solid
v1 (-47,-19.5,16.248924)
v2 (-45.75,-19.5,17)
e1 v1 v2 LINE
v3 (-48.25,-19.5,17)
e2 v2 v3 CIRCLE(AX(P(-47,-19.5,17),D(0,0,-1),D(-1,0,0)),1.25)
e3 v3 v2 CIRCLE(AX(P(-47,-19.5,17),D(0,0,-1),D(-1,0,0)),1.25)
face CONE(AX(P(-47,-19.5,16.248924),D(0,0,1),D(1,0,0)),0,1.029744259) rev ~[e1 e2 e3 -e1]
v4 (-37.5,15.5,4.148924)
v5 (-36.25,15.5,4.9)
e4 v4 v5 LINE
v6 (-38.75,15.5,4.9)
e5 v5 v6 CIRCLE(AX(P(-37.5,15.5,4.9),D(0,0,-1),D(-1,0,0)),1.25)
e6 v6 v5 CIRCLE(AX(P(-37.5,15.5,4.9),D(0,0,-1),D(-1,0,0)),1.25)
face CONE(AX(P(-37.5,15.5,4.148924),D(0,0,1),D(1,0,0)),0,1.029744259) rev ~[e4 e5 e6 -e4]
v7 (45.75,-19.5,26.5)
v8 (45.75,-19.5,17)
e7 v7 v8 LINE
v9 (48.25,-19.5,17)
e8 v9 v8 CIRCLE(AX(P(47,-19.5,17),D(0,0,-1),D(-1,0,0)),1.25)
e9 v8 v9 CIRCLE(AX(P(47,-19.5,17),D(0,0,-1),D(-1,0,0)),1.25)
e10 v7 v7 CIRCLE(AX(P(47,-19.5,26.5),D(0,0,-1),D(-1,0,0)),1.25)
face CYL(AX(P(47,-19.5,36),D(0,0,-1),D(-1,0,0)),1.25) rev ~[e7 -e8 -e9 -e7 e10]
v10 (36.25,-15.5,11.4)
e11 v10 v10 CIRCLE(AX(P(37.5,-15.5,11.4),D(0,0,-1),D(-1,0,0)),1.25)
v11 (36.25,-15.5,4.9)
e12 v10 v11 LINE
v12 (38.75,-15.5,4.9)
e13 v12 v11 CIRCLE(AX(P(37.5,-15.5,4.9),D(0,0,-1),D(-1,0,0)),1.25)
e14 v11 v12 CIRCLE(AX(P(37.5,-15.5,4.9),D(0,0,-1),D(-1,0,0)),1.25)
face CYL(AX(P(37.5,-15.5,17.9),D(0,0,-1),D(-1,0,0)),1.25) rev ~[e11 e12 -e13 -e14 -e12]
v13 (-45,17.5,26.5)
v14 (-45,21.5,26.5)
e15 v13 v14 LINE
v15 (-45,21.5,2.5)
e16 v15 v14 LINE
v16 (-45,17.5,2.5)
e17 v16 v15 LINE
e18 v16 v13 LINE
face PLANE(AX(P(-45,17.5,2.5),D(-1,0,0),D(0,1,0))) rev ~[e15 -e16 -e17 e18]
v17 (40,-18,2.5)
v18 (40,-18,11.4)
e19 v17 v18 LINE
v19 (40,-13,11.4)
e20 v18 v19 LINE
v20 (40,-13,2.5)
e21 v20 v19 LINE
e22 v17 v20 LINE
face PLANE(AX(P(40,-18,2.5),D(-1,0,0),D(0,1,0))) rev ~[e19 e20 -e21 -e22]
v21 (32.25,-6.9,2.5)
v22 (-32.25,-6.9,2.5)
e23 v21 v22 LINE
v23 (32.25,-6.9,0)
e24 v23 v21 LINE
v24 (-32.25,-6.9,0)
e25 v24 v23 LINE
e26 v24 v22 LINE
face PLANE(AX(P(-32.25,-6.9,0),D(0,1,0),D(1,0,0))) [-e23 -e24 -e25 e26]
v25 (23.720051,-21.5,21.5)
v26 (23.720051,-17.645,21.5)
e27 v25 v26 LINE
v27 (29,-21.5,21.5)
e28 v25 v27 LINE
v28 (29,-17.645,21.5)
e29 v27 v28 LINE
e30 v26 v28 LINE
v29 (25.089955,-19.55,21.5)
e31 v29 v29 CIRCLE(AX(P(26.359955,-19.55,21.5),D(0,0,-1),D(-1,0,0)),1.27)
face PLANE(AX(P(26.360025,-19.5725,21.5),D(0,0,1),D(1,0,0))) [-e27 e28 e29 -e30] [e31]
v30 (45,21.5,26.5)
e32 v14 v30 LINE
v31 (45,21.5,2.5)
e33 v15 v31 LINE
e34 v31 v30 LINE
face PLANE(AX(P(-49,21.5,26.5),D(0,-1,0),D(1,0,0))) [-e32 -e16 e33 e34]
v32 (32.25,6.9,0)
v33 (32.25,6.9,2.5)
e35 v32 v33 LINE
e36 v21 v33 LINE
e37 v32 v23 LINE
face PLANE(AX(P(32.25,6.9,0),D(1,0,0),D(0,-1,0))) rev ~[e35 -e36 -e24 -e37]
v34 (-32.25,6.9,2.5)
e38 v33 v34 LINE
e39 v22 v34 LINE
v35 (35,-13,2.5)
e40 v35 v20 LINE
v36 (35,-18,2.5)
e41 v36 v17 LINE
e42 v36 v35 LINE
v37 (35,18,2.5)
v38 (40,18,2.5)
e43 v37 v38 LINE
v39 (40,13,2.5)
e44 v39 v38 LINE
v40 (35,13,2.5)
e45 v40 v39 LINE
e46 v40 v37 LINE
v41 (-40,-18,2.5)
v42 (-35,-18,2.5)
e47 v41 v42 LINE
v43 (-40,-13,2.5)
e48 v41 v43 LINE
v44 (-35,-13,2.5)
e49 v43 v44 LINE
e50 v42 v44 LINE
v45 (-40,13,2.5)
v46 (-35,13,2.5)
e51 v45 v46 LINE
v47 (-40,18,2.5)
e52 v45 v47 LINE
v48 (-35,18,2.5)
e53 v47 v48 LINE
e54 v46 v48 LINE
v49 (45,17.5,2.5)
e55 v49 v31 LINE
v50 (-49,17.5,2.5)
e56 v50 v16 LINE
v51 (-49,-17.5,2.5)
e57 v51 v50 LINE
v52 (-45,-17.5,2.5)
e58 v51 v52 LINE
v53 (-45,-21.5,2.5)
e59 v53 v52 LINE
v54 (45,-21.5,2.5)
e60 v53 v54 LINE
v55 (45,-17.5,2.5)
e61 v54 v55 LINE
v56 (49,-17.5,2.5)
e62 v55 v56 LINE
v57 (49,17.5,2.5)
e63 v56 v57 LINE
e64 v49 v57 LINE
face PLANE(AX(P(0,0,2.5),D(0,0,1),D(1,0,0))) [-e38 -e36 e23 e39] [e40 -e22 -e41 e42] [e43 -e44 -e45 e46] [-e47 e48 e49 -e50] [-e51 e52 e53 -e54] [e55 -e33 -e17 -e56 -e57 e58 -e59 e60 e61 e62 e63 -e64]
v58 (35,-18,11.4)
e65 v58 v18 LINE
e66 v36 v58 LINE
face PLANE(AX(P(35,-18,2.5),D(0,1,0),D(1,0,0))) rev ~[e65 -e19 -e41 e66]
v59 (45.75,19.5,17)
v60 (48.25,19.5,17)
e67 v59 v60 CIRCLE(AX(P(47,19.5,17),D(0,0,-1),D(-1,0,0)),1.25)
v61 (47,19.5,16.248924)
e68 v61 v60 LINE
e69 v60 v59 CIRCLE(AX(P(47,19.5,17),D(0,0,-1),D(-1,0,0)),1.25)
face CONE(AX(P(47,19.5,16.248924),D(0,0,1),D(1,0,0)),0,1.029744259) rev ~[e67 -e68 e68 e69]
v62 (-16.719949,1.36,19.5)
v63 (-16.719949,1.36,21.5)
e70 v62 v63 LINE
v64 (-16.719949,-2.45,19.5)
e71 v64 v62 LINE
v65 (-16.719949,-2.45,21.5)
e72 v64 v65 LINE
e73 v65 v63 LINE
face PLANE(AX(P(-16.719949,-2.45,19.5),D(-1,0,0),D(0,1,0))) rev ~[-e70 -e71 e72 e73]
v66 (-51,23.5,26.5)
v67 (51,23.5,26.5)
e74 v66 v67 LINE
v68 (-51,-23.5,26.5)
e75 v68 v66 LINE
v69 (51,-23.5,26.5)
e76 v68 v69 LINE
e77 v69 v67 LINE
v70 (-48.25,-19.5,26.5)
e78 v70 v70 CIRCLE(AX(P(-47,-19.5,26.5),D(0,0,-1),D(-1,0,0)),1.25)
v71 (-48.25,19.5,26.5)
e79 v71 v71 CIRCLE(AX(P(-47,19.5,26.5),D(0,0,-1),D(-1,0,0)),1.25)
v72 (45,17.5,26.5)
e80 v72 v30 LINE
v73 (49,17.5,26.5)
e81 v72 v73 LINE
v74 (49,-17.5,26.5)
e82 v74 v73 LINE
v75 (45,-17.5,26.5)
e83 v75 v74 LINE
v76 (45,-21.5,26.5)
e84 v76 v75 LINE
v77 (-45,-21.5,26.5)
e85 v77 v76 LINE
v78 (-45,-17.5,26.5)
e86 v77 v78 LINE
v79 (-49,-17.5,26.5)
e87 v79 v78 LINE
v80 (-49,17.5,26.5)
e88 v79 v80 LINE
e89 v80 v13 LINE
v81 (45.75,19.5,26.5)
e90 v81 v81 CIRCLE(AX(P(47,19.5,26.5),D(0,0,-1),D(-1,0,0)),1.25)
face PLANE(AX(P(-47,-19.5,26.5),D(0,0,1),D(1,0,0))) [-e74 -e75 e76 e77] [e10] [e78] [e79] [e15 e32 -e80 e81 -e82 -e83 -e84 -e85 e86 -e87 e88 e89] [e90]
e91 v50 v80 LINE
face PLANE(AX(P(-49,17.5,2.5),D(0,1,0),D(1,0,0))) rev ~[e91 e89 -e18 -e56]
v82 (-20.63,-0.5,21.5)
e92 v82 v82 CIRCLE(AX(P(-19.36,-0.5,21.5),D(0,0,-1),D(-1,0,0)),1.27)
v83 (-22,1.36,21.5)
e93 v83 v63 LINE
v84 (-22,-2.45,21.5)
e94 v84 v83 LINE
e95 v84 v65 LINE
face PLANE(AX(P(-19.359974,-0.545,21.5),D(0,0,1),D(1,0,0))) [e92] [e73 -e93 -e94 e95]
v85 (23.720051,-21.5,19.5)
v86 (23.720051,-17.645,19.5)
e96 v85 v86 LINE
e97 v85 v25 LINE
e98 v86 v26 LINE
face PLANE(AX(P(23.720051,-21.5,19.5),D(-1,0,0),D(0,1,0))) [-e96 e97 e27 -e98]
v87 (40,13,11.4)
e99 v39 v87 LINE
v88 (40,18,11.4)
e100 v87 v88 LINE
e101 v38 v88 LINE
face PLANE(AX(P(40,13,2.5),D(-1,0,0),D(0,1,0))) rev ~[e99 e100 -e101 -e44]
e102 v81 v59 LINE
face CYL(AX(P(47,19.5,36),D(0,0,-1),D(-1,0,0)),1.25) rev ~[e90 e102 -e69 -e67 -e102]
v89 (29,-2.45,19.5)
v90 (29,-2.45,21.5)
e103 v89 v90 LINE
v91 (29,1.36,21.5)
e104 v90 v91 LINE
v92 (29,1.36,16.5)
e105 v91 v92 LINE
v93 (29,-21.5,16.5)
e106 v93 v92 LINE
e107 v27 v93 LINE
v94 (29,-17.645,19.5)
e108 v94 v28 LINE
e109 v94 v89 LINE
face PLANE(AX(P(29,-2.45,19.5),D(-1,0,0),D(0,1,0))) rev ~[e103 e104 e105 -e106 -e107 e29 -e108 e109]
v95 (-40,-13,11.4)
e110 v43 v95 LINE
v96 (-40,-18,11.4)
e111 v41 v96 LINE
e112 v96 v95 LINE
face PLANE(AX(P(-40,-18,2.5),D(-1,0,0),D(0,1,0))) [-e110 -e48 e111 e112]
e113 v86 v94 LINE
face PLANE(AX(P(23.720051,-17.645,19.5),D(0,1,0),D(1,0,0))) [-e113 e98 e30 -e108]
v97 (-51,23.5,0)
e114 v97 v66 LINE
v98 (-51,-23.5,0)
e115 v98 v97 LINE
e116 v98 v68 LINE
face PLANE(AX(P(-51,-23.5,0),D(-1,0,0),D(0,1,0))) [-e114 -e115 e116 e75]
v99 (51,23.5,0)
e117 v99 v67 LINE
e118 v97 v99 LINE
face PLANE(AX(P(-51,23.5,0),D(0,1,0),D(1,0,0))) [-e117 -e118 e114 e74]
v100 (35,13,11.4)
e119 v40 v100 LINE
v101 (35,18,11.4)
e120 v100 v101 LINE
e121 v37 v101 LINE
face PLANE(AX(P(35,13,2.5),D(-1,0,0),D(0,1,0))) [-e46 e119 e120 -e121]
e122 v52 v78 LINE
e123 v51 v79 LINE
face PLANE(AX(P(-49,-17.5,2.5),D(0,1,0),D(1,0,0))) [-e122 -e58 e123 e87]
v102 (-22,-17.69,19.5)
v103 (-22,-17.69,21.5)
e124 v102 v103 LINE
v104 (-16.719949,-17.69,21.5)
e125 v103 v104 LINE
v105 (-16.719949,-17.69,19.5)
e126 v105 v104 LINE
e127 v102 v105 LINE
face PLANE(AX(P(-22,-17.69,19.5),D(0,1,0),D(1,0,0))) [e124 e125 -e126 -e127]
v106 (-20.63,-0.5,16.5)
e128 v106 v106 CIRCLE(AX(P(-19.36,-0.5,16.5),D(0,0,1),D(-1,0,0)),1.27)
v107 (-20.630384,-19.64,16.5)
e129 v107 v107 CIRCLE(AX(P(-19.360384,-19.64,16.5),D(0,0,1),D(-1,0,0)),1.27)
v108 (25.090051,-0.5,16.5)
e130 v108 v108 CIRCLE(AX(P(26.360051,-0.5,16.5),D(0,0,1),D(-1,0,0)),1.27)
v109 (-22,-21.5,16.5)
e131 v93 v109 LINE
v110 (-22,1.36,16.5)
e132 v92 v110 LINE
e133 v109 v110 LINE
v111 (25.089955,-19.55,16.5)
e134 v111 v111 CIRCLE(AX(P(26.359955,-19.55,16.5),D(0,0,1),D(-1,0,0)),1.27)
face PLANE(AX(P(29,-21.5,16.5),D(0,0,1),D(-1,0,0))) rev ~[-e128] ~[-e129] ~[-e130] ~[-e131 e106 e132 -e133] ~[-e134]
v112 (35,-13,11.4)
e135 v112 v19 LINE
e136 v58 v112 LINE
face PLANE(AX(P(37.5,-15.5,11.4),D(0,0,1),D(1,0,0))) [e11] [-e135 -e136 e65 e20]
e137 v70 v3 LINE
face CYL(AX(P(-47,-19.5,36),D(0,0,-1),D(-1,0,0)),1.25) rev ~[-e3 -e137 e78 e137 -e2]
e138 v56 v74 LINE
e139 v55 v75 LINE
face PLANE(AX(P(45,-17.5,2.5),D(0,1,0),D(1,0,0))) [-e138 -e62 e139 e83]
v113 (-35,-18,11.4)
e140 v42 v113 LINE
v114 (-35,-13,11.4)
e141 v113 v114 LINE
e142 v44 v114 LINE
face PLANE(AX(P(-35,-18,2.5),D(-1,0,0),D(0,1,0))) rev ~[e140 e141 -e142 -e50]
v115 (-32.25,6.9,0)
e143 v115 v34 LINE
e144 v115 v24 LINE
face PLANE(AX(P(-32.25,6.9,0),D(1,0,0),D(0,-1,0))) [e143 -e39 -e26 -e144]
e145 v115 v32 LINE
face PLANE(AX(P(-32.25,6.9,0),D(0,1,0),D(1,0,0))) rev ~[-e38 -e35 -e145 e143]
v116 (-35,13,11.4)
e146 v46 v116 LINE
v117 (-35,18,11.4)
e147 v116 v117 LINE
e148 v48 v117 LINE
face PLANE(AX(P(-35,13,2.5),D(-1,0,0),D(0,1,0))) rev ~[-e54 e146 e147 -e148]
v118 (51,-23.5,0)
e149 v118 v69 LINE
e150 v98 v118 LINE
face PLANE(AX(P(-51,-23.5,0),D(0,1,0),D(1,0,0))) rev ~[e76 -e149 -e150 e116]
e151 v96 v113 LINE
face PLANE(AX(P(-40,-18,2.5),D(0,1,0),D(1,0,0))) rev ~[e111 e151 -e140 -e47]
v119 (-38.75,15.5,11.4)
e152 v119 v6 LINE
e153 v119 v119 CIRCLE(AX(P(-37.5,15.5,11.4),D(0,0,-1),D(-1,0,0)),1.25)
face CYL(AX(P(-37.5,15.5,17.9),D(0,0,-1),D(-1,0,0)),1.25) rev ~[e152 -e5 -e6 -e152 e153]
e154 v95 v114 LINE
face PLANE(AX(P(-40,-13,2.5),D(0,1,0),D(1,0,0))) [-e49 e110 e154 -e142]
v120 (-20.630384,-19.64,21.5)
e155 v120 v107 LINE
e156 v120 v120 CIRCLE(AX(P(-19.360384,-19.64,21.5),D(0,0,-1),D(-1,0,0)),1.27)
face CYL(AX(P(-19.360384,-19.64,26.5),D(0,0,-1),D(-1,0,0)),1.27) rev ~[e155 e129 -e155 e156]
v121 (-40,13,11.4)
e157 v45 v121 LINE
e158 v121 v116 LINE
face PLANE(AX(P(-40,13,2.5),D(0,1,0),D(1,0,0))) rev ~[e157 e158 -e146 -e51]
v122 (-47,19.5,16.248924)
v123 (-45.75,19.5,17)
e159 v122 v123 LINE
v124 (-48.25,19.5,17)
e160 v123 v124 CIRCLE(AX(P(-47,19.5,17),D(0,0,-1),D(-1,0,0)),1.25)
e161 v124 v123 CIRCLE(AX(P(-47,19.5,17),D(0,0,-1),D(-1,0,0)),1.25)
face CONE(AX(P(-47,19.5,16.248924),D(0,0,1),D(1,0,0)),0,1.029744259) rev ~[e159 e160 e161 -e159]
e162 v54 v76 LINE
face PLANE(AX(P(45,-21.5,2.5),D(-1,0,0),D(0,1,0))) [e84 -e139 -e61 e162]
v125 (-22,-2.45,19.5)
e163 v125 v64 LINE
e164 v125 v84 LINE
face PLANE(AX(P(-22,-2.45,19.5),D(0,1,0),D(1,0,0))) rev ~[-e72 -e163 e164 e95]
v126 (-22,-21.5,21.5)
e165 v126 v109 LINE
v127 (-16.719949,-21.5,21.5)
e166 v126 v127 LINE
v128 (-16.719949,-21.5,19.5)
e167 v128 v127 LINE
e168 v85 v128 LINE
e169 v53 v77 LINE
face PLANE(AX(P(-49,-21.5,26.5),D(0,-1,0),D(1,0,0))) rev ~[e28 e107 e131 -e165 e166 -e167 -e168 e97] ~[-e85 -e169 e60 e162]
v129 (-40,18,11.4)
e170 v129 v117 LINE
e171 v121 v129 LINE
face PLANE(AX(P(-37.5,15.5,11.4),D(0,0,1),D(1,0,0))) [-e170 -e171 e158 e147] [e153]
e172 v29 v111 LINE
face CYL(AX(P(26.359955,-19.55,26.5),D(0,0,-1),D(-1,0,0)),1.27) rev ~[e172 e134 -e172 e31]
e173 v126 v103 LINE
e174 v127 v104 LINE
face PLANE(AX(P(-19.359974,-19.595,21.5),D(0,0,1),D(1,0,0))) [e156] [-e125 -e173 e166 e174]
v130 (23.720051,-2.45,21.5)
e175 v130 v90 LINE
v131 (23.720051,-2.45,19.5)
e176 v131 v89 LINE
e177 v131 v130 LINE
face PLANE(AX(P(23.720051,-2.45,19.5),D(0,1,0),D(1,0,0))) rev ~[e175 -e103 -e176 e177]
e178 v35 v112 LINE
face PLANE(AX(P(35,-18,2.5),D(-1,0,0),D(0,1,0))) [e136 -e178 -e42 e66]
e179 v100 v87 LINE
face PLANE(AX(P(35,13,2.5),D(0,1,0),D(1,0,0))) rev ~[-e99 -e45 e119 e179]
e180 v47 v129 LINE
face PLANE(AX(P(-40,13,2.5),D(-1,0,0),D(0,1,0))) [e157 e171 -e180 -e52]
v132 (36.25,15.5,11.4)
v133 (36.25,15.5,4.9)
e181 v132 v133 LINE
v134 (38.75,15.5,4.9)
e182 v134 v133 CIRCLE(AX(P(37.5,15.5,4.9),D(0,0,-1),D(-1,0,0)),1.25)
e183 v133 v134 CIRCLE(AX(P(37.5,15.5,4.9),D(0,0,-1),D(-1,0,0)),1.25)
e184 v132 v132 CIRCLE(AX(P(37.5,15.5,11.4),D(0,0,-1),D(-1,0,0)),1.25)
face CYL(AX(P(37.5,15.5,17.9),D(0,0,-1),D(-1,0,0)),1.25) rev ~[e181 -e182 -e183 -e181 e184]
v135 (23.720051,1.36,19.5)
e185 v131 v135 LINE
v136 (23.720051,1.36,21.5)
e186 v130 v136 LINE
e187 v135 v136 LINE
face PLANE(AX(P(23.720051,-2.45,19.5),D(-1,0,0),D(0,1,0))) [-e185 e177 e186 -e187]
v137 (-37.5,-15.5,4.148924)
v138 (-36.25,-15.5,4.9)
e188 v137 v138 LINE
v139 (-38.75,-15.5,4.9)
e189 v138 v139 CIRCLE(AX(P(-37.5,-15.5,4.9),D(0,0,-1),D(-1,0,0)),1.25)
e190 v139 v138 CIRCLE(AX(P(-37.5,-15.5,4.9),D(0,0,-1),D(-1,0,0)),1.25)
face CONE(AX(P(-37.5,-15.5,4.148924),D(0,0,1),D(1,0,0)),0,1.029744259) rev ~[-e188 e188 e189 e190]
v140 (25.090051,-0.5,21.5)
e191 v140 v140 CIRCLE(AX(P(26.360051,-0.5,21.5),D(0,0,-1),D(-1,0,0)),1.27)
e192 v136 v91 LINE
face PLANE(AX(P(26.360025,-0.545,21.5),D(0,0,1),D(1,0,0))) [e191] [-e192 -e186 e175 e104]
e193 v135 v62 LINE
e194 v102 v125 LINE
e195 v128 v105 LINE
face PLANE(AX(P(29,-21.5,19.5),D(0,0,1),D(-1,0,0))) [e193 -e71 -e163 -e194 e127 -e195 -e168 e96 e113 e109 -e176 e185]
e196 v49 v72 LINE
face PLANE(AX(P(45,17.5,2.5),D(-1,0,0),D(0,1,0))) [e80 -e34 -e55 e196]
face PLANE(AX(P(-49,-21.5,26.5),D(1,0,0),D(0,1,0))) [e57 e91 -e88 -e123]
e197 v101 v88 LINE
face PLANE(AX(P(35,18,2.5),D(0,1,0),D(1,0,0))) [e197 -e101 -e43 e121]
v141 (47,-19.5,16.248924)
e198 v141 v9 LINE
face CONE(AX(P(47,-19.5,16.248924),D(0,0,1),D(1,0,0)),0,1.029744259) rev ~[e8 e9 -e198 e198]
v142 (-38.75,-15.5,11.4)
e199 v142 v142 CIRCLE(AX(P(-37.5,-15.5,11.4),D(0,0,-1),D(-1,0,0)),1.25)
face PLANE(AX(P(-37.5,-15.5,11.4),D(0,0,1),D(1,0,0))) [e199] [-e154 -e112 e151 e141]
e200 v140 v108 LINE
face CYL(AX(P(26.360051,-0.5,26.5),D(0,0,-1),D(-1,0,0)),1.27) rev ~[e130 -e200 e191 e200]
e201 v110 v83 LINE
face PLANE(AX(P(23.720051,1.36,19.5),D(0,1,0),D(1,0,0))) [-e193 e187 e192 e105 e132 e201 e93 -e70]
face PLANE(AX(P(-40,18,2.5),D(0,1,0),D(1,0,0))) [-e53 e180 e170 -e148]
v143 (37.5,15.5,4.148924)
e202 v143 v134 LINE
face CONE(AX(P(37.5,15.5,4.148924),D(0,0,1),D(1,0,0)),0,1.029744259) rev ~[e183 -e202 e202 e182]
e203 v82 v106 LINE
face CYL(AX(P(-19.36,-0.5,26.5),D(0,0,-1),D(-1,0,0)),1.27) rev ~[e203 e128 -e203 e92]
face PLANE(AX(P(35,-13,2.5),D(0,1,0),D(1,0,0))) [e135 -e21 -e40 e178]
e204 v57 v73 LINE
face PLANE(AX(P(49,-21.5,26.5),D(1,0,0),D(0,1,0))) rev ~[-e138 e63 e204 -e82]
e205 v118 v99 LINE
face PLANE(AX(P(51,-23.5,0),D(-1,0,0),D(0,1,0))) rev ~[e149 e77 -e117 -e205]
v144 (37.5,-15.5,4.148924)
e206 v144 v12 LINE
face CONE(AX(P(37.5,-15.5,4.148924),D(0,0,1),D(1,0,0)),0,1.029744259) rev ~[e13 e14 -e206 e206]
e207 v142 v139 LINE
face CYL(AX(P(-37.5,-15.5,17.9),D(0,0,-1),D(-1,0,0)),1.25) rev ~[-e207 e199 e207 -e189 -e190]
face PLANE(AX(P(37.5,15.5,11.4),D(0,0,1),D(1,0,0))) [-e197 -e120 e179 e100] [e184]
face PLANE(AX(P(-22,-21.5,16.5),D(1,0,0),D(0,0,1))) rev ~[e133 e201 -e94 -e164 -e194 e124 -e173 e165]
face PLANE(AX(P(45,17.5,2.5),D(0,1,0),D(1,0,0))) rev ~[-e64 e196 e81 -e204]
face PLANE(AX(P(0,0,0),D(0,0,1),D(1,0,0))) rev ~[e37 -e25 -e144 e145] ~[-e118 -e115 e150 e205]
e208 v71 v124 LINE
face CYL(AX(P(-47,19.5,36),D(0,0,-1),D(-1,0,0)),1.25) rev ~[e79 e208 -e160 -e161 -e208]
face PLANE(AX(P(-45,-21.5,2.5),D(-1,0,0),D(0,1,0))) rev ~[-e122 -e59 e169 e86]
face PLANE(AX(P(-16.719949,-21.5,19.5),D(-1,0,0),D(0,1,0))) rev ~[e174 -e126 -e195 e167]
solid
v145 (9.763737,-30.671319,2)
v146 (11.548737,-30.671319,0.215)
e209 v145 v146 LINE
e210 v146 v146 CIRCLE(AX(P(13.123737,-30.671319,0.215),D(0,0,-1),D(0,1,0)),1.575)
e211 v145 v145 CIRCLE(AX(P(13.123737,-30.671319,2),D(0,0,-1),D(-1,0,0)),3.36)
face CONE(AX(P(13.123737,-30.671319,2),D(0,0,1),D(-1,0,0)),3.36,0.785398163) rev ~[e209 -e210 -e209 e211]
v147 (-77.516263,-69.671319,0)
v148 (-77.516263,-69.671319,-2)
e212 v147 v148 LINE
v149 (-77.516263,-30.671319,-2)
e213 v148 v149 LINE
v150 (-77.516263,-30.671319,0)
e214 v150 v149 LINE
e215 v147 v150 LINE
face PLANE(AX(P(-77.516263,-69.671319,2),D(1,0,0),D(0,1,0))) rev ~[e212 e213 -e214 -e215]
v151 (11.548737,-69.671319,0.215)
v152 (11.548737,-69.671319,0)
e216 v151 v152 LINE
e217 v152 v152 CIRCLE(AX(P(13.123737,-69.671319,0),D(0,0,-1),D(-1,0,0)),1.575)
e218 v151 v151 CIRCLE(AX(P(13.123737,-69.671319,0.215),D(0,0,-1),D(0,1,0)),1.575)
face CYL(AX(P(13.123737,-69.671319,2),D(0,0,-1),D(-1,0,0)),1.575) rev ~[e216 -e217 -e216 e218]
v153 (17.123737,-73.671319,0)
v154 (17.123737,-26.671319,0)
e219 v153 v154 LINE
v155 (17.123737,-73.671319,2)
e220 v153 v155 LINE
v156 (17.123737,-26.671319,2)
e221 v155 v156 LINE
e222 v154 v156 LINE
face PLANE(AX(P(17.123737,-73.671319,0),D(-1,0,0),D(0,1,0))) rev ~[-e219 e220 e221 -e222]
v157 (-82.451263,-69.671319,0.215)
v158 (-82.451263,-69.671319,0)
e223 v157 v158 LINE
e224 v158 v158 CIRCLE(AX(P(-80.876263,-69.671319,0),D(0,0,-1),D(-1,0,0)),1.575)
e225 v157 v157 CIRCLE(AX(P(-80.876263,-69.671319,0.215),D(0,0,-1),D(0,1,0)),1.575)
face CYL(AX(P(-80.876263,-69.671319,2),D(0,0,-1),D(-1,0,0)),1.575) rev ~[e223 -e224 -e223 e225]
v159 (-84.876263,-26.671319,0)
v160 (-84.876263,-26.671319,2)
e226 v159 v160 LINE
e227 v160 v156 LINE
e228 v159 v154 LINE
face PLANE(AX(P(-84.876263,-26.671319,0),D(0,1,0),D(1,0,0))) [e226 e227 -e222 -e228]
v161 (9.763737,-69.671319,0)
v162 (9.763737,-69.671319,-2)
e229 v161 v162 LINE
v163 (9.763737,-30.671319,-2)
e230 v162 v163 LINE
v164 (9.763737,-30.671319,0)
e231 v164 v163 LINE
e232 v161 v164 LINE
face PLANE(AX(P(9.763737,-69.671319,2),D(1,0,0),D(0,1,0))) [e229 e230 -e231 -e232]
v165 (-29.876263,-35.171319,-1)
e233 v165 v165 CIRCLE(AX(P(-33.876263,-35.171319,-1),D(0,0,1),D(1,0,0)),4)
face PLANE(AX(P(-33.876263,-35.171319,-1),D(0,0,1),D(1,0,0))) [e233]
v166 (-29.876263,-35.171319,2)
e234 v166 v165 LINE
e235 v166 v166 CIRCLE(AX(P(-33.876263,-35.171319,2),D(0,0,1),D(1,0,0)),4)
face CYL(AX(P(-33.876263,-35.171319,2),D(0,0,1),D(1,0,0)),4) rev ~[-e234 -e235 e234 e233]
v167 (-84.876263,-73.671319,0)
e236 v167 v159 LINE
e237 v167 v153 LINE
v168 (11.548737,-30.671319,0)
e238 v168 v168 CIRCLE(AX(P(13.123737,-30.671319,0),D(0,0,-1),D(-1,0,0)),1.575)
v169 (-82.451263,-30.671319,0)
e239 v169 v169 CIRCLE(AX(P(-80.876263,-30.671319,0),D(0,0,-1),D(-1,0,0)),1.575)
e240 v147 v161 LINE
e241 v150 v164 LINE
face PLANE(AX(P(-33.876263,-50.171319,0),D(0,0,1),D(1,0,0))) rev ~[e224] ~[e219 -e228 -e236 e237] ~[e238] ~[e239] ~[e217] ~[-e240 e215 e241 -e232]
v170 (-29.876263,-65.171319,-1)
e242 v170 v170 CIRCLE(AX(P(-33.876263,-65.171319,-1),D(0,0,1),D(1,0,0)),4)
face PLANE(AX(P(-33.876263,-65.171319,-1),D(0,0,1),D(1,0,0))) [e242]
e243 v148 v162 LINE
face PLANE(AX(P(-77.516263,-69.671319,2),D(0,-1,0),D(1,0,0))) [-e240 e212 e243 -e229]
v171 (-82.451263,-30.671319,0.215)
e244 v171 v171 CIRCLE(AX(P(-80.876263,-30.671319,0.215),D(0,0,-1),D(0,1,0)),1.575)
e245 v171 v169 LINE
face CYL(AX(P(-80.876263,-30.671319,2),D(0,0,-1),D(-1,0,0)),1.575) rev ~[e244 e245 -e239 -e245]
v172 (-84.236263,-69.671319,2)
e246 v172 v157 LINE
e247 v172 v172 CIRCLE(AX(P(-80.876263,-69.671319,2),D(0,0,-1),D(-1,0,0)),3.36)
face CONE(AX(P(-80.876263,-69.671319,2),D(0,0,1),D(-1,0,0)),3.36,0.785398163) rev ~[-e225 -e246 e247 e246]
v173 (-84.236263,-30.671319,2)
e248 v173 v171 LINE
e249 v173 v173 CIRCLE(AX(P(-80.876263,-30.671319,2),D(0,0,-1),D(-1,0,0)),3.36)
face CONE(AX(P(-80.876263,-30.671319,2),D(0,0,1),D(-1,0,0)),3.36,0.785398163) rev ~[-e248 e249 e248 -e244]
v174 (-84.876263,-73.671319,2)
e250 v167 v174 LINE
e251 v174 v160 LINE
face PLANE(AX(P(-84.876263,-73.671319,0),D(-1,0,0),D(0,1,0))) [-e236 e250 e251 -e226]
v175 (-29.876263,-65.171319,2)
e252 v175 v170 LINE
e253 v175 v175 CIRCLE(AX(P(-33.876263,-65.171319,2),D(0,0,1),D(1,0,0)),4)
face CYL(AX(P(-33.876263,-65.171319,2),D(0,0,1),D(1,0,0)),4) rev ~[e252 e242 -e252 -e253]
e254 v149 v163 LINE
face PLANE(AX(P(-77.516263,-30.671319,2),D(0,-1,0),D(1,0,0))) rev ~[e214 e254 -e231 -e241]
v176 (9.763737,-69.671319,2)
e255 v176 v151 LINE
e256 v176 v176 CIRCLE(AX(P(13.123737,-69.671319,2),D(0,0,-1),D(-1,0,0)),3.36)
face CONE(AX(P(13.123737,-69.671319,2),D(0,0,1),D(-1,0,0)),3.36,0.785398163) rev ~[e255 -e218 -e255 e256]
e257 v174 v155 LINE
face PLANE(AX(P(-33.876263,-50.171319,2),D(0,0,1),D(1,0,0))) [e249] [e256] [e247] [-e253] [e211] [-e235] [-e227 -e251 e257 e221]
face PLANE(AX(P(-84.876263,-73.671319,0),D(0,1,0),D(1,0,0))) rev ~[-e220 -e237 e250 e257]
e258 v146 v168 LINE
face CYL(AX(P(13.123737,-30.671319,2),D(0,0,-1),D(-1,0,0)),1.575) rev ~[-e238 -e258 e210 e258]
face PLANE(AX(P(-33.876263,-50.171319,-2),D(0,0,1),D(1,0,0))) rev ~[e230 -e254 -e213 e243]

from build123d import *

# Parameters (mm, degrees)
F0_W             = 102
F0_H             = 47
F1_DEPTH         = 26.5
F2_W             = 98
F2_H             = 43
F3_DEPTH         = 24
F4_W             = 64.5
F4_H             = 13.8
F5_DEPTH         = 26.501
F6_W             = 5
F6_H             = 5
F7_DEPTH         = 8.9
F12_D            = 2.5
F12_DEPTH        = 6.5
F12_TIP          = 0.7510757738
F12_ON_F9_D      = 2.5
F12_ON_F9_DEPTH  = 6.5
F12_ON_F9_TIP    = 0.7510757738
F12_ON_F11_D     = 2.5
F12_ON_F11_DEPTH = 6.5
F12_ON_F11_TIP   = 0.7510757738
F12_ON_F10_D     = 2.5
F12_ON_F10_DEPTH = 6.5
F12_ON_F10_TIP   = 0.7510757738
F13_W            = 4
F13_H            = 4
F14_DEPTH        = 24
F16_D            = 2.5
F16_DEPTH        = 9.5
F16_TIP          = 0.7510757738
F17_W            = 102
F17_H            = 47
F18_DEPTH        = 2
F20_D            = 3.15
F20_CSINK_D      = 6.72
F20_CSINK_ANGLE  = 90
F21_W            = 87.28
F21_H            = 39
F22_DEPTH        = 4
F23_R            = 4
F24_DEPTH        = 3
F25_W            = 51
F25_H            = 3
F26_DEPTH        = 22.86
F27_W            = 5.279949
F27_H            = 3.81
F27_H_2          = 3.855
F27_W_2          = 5.280051
F28_DEPTH        = 2
F33_D            = 2.54
F33_DEPTH        = 5
F33_TIP          = 0.7630929862
F33_ON_F30_D     = 2.54
F33_ON_F30_DEPTH = 5
F33_ON_F30_TIP   = 0.7630929862
F33_ON_F32_D     = 2.54
F33_ON_F32_DEPTH = 5
F33_ON_F32_TIP   = 0.7630929862
F33_ON_F31_D     = 2.54
F33_ON_F31_DEPTH = 5
F33_ON_F31_TIP   = 0.7630929862


# Not quite as in the source:
# - a feature names something its author has since deleted; it is built from what else it names


with BuildPart() as f1:
    # F0 (on Top) → F1 (new body)
    with BuildSketch(Plane.XY):
        Rectangle(F0_W, F0_H)
    extrude(amount=F1_DEPTH)

    # F2 (on face) → F3 (cut)
    with BuildSketch(Plane.XY.offset(26.5)):
        Rectangle(F2_W, F2_H)
    extrude(amount=-F3_DEPTH, mode=Mode.SUBTRACT)

    # F4 (on face) → F5 (cut, through all)
    with BuildSketch(Plane(origin=(0, 0, 0), x_dir=(1, 0, 0), z_dir=(0, 0, -1))):
        Rectangle(F4_W, F4_H)
    extrude(amount=-F5_DEPTH, mode=Mode.SUBTRACT)

    # F6 (on face) → F7 (join)
    with BuildSketch(Plane.XY.offset(2.5)):
        with Locations((-37.5, 15.5)):
            Rectangle(F6_W, F6_H)
        with Locations((-37.5, -15.5)):
            Rectangle(F6_W, F6_H)
        with Locations((37.5, -15.5)):
            Rectangle(F6_W, F6_H)
        with Locations((37.5, 15.5)):
            Rectangle(F6_W, F6_H)
    extrude(amount=F7_DEPTH)

    # F12
    with Locations(Plane.XY.offset(11.4)):
        with Locations((-37.5, 15.5)):
            Hole(F12_D / 2, depth=F12_DEPTH)
            with Locations((0, 0, -(F12_DEPTH + F12_TIP / 2))):  # 118° drill point
                Cone(0, F12_D / 2, F12_TIP, mode=Mode.SUBTRACT)

    # F12 on F9
    with Locations(Plane.XY.offset(11.4)):
        with Locations((-37.5, -15.5)):
            Hole(F12_ON_F9_D / 2, depth=F12_ON_F9_DEPTH)
            with Locations((0, 0, -(F12_ON_F9_DEPTH + F12_ON_F9_TIP / 2))):  # 118° drill point
                Cone(0, F12_ON_F9_D / 2, F12_ON_F9_TIP, mode=Mode.SUBTRACT)

    # F12 on F11
    with Locations(Plane.XY.offset(11.4)):
        with Locations((37.5, -15.5)):
            Hole(F12_ON_F11_D / 2, depth=F12_ON_F11_DEPTH)
            with Locations((0, 0, -(F12_ON_F11_DEPTH + F12_ON_F11_TIP / 2))):  # 118° drill point
                Cone(0, F12_ON_F11_D / 2, F12_ON_F11_TIP, mode=Mode.SUBTRACT)

    # F12 on F10
    with Locations(Plane.XY.offset(11.4)):
        with Locations((37.5, 15.5)):
            Hole(F12_ON_F10_D / 2, depth=F12_ON_F10_DEPTH)
            with Locations((0, 0, -(F12_ON_F10_DEPTH + F12_ON_F10_TIP / 2))):  # 118° drill point
                Cone(0, F12_ON_F10_D / 2, F12_ON_F10_TIP, mode=Mode.SUBTRACT)

    # F13 (on face) → F14 (join)
    with BuildSketch(Plane.XY.offset(2.5)):
        with Locations((-47, -19.5)):
            Rectangle(F13_W, F13_H)
        with Locations((-47, 19.5)):
            Rectangle(F13_W, F13_H)
        with Locations((47, 19.5)):
            Rectangle(F13_W, F13_H)
        with Locations((47, -19.5)):
            Rectangle(F13_W, F13_H)
    extrude(amount=F14_DEPTH)

    # F16
    with Locations(Plane.XY.offset(26.5)):
        with Locations((-47, -19.5), (-47, 19.5), (47, 19.5), (47, -19.5)):
            Hole(F16_D / 2, depth=F16_DEPTH)
            with Locations((0, 0, -(F16_DEPTH + F16_TIP / 2))):  # 118° drill point
                Cone(0, F16_D / 2, F16_TIP, mode=Mode.SUBTRACT)

    # F25 (on face) → F26 (join)
    with BuildSketch(Plane(origin=(0, -21.5, 0), x_dir=(-1, 0, 0), z_dir=(0, 1, 0))):
        with Locations((-3.5, 18)):
            Rectangle(F25_W, F25_H)
    extrude(amount=F26_DEPTH)

    # F27 (on face) → F28 (join)
    with BuildSketch(Plane.XY.offset(19.5)):
        with Locations((26.3600255, -0.545)):
            Rectangle(F27_W, F27_H)
        with Locations((26.3600255, -19.5725)):
            Rectangle(F27_W, F27_H_2)
        with Locations((-19.3599745, -19.595)):
            Rectangle(F27_W_2, F27_H)
        with Locations((-19.3599745, -0.545)):
            Rectangle(F27_W_2, F27_H)
    extrude(amount=F28_DEPTH)

    # F33
    with Locations(Plane.XY.offset(21.5)):
        with Locations((26.360051, -0.5000000002)):
            Hole(F33_D / 2, depth=F33_DEPTH)
            with Locations((0, 0, -(F33_DEPTH + F33_TIP / 2))):  # 118° drill point
                Cone(0, F33_D / 2, F33_TIP, mode=Mode.SUBTRACT)

    # F33 on F30
    with Locations(Plane.XY.offset(21.5)):
        with Locations((26.3599551176, -19.5500000013)):
            Hole(F33_ON_F30_D / 2, depth=F33_ON_F30_DEPTH)
            with Locations((0, 0, -(F33_ON_F30_DEPTH + F33_ON_F30_TIP / 2))):  # 118° drill point
                Cone(0, F33_ON_F30_D / 2, F33_ON_F30_TIP, mode=Mode.SUBTRACT)

    # F33 on F32
    with Locations(Plane.XY.offset(21.5)):
        with Locations((-19.36, -0.5000000002)):
            Hole(F33_ON_F32_D / 2, depth=F33_ON_F32_DEPTH)
            with Locations((0, 0, -(F33_ON_F32_DEPTH + F33_ON_F32_TIP / 2))):  # 118° drill point
                Cone(0, F33_ON_F32_D / 2, F33_ON_F32_TIP, mode=Mode.SUBTRACT)

    # F33 on F31
    with Locations(Plane.XY.offset(21.5)):
        with Locations((-19.3603835499, -19.6399999571)):
            Hole(F33_ON_F31_D / 2, depth=F33_ON_F31_DEPTH)
            with Locations((0, 0, -(F33_ON_F31_DEPTH + F33_ON_F31_TIP / 2))):  # 118° drill point
                Cone(0, F33_ON_F31_D / 2, F33_ON_F31_TIP, mode=Mode.SUBTRACT)


with BuildPart() as f18:
    # F17 (on Top) → F18 (new body)
    with BuildSketch(Plane.XY):
        with Locations((-33.8762627295, -50.1713193953)):
            Rectangle(F17_W, F17_H)
    extrude(amount=F18_DEPTH)

    # F20 (through all)
    with Locations(Plane.XY.offset(2)):
        with Locations((-80.8762627295, -30.6713193953), (-80.8762627295, -69.6713193953), (13.1237372705, -69.6713193953), (13.1237372705, -30.6713193953)):
            CounterSinkHole(F20_D / 2, F20_CSINK_D / 2, counter_sink_angle=F20_CSINK_ANGLE)

    # F21 (on face) → F22 (join)
    with BuildSketch(Plane.XY.offset(2)):
        with Locations((-33.8762627295, -50.1713193953)):
            Rectangle(F21_W, F21_H)
    extrude(amount=-F22_DEPTH)

    # F23 (on face) → F24 (cut)
    with BuildSketch(Plane.XY.offset(2)):
        with Locations((-33.8762627295, -35.1713193953)):
            Circle(F23_R)
        with Locations((-33.8762627295, -65.1713193953)):
            Circle(F23_R)
    extrude(amount=-F24_DEPTH, mode=Mode.SUBTRACT)


solid = Compound([f1.part, f18.part])
